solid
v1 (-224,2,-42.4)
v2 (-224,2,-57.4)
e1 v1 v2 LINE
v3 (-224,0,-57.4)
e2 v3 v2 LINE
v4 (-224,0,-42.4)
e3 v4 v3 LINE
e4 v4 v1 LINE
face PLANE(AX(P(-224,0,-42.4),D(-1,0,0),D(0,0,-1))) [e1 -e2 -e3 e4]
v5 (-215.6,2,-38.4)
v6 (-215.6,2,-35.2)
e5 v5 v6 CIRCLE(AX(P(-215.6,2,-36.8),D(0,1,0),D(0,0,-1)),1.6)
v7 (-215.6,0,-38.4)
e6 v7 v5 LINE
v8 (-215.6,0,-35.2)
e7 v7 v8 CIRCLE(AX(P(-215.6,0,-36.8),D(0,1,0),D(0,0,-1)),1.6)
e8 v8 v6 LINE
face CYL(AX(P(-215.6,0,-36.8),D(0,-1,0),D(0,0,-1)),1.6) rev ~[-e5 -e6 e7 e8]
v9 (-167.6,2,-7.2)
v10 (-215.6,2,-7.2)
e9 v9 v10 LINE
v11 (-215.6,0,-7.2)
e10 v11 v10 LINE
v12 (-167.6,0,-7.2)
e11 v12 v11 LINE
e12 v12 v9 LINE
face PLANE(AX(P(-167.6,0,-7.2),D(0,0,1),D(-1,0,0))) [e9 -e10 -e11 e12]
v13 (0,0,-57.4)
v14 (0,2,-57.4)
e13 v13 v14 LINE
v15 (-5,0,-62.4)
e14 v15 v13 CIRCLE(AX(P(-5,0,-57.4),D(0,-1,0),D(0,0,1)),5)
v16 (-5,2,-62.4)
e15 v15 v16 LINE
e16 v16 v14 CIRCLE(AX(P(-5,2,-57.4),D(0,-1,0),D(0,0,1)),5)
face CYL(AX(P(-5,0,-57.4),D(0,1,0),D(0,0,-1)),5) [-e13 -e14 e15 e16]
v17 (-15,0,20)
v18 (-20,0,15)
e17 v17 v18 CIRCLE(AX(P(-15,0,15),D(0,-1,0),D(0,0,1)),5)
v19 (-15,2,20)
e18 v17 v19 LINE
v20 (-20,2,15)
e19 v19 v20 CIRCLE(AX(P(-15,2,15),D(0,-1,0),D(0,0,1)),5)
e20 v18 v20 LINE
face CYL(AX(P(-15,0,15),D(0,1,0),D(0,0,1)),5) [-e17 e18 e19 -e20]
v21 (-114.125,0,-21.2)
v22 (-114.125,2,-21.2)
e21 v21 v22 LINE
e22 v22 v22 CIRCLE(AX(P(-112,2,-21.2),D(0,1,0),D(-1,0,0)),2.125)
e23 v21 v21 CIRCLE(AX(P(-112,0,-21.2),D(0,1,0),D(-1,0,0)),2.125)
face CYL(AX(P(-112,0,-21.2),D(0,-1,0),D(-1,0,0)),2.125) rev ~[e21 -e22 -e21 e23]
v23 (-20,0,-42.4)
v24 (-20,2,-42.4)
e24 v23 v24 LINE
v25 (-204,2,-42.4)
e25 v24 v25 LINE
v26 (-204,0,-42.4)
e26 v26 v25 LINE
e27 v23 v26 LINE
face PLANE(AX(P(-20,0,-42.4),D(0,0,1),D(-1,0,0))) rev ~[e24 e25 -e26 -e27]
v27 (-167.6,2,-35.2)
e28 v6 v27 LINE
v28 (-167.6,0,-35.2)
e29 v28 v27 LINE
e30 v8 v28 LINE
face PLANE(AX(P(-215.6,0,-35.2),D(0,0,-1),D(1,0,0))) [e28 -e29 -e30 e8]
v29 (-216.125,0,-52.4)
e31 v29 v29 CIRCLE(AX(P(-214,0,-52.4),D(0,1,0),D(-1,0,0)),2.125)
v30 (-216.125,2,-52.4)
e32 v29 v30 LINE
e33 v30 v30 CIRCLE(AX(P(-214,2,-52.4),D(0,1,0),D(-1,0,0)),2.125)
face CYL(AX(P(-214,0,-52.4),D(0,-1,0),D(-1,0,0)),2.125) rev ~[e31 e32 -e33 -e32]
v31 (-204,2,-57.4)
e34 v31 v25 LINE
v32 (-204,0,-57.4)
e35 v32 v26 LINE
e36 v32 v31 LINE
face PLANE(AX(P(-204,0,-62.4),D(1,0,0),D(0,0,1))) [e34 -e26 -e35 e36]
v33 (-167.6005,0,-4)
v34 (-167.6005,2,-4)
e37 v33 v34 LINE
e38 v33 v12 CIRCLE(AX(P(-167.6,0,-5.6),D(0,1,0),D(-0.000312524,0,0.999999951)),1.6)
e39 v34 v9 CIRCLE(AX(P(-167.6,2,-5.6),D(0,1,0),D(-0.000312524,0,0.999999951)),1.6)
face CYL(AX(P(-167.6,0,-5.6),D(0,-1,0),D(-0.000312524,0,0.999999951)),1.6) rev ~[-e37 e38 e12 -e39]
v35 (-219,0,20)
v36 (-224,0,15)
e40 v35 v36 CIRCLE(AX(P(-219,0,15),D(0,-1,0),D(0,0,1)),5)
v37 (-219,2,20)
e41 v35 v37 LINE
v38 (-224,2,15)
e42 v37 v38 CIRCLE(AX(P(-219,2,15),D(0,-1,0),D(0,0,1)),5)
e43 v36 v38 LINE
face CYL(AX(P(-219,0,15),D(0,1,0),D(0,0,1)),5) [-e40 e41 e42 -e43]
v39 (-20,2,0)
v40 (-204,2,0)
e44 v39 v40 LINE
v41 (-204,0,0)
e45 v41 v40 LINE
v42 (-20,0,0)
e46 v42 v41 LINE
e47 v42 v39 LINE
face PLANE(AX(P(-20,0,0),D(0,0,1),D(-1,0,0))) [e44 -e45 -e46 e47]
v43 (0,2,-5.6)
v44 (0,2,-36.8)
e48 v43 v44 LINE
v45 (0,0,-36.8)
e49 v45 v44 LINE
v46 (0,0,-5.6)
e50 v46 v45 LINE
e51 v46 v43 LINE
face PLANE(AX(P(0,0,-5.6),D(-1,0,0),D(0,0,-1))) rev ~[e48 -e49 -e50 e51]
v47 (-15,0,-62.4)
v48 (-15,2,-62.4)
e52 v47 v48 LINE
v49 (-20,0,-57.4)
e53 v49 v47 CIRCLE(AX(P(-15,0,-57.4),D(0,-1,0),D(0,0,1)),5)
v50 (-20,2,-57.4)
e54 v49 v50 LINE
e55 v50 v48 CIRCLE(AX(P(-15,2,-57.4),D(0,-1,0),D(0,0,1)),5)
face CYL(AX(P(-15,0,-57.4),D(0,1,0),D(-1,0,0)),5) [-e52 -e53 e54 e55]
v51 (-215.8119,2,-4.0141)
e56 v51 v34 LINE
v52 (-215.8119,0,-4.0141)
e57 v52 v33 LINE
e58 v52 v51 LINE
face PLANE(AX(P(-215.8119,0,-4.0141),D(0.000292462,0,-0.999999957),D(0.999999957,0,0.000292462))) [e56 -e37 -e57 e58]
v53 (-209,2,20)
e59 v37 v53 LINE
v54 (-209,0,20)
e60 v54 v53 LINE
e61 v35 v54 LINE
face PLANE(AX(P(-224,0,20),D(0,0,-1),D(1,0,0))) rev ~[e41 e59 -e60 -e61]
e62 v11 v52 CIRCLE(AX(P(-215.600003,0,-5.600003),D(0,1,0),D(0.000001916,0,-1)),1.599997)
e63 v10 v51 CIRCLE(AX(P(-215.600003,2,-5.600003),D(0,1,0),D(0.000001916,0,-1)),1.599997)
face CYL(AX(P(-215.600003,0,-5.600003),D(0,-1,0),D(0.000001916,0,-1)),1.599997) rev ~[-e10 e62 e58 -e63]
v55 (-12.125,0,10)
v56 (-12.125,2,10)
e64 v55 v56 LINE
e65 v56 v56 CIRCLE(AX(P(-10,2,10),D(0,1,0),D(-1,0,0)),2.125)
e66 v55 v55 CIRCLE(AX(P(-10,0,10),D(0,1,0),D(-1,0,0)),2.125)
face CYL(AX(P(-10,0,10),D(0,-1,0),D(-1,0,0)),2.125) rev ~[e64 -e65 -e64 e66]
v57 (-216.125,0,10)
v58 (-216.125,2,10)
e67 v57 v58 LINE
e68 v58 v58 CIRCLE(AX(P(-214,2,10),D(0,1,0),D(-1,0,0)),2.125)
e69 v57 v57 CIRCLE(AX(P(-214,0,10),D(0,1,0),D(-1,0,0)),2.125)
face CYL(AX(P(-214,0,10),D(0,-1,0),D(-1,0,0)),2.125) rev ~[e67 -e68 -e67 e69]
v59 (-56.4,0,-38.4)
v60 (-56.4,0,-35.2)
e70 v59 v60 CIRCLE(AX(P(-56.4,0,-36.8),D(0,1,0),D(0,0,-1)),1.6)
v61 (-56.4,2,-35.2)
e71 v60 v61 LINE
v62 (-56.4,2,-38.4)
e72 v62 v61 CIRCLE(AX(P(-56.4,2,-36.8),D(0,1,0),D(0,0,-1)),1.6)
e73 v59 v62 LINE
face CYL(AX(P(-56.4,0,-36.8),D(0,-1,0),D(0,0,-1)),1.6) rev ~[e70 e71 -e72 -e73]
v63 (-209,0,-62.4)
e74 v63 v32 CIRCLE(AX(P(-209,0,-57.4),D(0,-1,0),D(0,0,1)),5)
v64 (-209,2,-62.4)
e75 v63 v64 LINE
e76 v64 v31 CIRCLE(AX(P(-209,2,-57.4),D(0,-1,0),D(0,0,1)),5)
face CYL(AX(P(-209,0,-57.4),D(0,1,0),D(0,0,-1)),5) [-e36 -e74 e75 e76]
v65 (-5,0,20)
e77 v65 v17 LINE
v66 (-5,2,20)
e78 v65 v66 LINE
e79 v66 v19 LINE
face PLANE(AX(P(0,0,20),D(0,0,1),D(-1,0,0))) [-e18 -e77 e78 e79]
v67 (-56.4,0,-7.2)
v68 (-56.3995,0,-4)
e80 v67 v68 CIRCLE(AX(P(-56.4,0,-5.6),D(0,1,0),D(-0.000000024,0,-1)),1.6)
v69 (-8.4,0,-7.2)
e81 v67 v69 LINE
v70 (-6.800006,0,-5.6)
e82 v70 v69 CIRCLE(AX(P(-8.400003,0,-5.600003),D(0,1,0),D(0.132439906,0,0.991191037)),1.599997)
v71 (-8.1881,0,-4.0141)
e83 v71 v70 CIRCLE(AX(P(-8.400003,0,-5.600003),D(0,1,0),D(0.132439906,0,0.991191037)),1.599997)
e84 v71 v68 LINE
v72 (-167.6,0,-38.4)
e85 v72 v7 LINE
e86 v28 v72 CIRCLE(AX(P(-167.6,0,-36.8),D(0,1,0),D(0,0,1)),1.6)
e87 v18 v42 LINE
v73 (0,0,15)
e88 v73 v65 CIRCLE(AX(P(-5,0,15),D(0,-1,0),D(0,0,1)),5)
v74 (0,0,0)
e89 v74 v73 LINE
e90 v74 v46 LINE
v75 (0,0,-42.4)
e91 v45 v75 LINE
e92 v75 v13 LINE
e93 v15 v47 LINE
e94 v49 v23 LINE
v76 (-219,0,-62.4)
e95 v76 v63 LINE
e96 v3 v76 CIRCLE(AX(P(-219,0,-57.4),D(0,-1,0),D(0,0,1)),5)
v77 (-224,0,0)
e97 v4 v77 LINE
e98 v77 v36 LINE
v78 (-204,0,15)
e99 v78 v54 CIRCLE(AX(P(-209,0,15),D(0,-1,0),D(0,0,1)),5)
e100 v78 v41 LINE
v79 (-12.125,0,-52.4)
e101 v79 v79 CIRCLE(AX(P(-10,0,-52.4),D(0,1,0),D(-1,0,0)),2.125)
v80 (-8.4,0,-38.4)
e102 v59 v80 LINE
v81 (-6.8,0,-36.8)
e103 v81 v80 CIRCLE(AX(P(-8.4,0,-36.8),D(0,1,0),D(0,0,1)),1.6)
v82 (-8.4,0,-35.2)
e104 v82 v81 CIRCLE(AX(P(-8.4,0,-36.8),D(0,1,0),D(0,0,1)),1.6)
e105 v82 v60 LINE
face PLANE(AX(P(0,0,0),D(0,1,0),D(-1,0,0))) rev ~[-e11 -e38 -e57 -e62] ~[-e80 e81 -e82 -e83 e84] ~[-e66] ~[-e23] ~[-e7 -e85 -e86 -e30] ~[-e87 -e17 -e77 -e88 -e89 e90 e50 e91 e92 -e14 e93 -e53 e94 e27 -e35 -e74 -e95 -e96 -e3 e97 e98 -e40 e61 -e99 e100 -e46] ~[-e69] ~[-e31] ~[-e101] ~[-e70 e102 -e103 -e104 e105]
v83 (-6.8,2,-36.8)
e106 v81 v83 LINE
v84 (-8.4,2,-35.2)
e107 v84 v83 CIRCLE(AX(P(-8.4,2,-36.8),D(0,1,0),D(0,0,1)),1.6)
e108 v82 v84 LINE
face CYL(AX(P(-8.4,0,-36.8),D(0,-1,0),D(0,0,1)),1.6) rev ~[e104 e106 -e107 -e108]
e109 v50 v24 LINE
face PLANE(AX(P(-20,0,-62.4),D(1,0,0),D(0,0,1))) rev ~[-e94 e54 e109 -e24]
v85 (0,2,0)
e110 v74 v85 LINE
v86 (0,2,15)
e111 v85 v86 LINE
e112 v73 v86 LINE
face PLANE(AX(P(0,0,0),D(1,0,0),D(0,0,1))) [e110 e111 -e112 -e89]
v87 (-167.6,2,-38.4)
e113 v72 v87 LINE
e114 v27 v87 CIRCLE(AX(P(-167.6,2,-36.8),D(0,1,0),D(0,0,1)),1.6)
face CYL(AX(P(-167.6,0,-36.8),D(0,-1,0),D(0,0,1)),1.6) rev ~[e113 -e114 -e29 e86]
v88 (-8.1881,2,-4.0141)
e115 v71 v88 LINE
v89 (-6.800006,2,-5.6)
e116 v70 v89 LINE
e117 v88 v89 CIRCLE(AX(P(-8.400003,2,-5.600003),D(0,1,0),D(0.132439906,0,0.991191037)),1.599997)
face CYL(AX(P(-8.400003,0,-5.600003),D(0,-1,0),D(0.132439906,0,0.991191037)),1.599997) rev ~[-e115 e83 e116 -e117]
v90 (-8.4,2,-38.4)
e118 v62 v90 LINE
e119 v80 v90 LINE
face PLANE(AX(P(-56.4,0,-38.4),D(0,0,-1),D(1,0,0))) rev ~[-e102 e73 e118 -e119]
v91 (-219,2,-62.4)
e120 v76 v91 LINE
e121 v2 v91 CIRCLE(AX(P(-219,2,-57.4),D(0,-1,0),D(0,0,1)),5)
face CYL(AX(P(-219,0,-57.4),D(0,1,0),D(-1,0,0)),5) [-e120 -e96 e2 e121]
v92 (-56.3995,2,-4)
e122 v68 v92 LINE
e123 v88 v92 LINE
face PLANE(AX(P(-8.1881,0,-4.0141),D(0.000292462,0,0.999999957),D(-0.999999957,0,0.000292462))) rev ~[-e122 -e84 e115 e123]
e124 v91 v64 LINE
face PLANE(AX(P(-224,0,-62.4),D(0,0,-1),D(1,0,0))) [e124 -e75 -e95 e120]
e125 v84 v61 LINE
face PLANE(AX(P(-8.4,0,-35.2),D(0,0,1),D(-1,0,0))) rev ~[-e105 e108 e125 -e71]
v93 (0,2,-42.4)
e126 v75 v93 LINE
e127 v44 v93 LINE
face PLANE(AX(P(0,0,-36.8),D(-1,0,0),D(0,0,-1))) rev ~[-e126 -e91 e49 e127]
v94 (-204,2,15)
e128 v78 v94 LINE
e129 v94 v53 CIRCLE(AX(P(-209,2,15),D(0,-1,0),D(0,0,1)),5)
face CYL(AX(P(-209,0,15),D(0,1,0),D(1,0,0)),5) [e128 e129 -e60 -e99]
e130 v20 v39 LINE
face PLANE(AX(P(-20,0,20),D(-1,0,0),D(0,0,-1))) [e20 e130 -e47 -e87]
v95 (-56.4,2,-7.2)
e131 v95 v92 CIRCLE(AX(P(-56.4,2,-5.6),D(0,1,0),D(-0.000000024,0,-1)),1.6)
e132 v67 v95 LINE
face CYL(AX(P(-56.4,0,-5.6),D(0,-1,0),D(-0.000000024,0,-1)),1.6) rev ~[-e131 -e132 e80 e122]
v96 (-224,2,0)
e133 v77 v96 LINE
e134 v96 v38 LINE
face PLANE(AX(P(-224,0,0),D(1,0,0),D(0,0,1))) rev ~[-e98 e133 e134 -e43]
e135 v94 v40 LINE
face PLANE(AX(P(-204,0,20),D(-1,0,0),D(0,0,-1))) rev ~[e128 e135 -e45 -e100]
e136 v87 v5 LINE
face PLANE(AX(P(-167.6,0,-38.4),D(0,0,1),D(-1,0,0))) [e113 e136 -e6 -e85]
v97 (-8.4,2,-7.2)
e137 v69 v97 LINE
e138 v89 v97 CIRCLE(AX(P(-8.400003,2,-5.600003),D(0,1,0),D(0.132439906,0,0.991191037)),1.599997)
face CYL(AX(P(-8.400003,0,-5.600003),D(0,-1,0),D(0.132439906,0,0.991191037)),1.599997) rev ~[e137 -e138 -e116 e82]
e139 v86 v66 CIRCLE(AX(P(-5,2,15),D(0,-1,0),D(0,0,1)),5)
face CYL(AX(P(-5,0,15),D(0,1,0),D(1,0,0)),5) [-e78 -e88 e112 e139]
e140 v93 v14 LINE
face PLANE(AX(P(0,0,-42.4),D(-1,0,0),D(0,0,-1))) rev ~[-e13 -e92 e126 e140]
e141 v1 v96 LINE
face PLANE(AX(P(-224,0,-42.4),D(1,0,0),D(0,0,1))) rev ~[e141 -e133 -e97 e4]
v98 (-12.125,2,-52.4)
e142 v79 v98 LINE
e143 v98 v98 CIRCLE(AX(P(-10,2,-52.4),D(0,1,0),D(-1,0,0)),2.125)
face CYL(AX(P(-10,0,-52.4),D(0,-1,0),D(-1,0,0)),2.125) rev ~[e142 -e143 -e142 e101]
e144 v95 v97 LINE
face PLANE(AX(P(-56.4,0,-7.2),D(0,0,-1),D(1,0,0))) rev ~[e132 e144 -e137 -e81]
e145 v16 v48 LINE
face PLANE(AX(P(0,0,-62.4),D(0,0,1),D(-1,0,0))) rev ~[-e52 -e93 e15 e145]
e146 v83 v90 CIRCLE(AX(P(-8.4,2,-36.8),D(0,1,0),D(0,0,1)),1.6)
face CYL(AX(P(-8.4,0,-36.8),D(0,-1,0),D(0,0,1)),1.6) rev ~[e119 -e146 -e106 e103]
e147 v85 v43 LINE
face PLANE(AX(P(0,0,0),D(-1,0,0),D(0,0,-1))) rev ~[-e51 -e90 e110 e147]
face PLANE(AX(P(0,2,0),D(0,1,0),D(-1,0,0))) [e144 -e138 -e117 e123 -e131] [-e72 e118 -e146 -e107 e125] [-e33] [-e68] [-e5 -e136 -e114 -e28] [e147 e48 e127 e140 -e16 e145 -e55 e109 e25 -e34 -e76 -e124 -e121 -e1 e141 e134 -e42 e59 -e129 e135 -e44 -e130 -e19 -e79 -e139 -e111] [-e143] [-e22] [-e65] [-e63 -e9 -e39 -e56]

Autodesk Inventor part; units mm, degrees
ref_plane "YZ Plane" through (0, 0, 0) normal (1, 0, 0) x (0, 1, 0)
ref_plane "XZ Plane" through (0, 0, 0) normal (0, 1, 0) x (-1, 0, 0)
ref_plane "XY Plane" through (0, 0, 0) normal (0, 0, 1) x (1, 0, 0)
sketch "Sketch1" plane through (0, 0, 0) normal (0, 1, 0) x (-1, 0, 0)
  line L0 (0, 0) -> (0, -42.4)
  line L1 (20, 0) -> (204, 0)
  line L2 (20, -42.4) -> (204, -42.4)
  line L3 (224, -42.4) -> (224, 0)
  line L4 (0, -42.4) -> (0, -62.4)
  line L5 (0, -62.4) -> (20, -62.4)
  line L6 (20, -62.4) -> (20, -42.4)
  line L7 (0, 0) -> (0, 20)
  line L8 (0, 20) -> (20, 20)
  line L9 (20, 20) -> (20, 0)
  line L10 (224, -42.4) -> (224, -62.4)
  line L11 (224, -62.4) -> (204, -62.4)
  line L12 (204, -62.4) -> (204, -42.4)
  line L13 (224, 0) -> (224, 20)
  line L14 (224, 20) -> (204, 20)
  line L15 (204, 20) -> (204, 0)
  circle A0 centre (10, -52.4) radius 2.125
  circle A1 centre (10, 10) radius 2.125
  circle A2 centre (214, -52.4) radius 2.125
  circle A3 centre (214, 10) radius 2.125
  circle A4 centre (112, -21.2) radius 2.125
  line L16 (0, -42.4) -> (0, -36.8)
  line L17 (0, -36.8) -> (8.4, -36.8)
  arc A5 (8.4, -35.2) -> (8.4, -38.4) centre (8.4, -36.8) ccw
  line L18 (0, 0) -> (0, -5.6)
  line L19 (0, -5.6) -> (8.4, -5.6)
  arc A6 (8.1881, -4.0141) -> (8.4, -7.2) centre (8.4, -5.6) ccw
  arc A7 (56.4, -38.4) -> (56.4, -35.2) centre (56.4, -36.8) ccw
  line L20 (8.4, -35.2) -> (56.4, -35.2)
  line L21 (56.4, -38.4) -> (8.4, -38.4)
  arc A8 (56.4, -7.2) -> (56.3995, -4) centre (56.4, -5.6) ccw
  line L22 (56.4, -7.2) -> (8.4, -7.2)
  line L23 (8.1881, -4.0141) -> (56.3995, -4)
  arc A9 (215.6, -38.4) -> (215.6, -35.2) centre (215.6, -36.8) ccw
  arc A10 (215.6, -7.2) -> (215.8119, -4.0141) centre (215.6, -5.6) ccw
  arc A11 (167.6, -35.2) -> (167.6, -38.4) centre (167.6, -36.8) ccw
  line L24 (215.6, -35.2) -> (167.6, -35.2)
  line L25 (167.6, -38.4) -> (215.6, -38.4)
  arc A12 (167.6005, -4) -> (167.6, -7.2) centre (167.6, -5.6) ccw
  line L26 (167.6, -7.2) -> (215.6, -7.2)
  line L27 (215.8119, -4.0141) -> (167.6005, -4)
  dimension "d1" = 42.4
  dimension "d2" = 224
  dimension "d3" = 224
  dimension "d4" = 20
  dimension "d5" = 20
  dimension "d6" = 20
  dimension "d7" = 20
  dimension "d8" = 20
  dimension "d9" = 20
  dimension "d10" = 4.25
  dimension "d11" = 4.25
  dimension "d12" = 4.25
  dimension "d13" = 4.25
  dimension "d14" = 4.25
  dimension "d15" = 5.6
  dimension "d16" = 8.4
  dimension "d17" = 3.2
  dimension "d18" = 5.6
  dimension "d19" = 3.2
  dimension "d23" = 3.2
  dimension "d28" = 3.2
extrude "Extrusion1" add sketch "Sketch1" along normal blind 2
fillet "Fillet1" radius 5 8 edges at (0, 1, 20) (-20, 1, 20) (0, 1, -62.4) (-20, 1, -62.4) (-204, 1, -62.4) (-224, 1, -62.4) (-204, 1, 20) (-224, 1, 20)
properties part number "Motor Attachment 3.0"
